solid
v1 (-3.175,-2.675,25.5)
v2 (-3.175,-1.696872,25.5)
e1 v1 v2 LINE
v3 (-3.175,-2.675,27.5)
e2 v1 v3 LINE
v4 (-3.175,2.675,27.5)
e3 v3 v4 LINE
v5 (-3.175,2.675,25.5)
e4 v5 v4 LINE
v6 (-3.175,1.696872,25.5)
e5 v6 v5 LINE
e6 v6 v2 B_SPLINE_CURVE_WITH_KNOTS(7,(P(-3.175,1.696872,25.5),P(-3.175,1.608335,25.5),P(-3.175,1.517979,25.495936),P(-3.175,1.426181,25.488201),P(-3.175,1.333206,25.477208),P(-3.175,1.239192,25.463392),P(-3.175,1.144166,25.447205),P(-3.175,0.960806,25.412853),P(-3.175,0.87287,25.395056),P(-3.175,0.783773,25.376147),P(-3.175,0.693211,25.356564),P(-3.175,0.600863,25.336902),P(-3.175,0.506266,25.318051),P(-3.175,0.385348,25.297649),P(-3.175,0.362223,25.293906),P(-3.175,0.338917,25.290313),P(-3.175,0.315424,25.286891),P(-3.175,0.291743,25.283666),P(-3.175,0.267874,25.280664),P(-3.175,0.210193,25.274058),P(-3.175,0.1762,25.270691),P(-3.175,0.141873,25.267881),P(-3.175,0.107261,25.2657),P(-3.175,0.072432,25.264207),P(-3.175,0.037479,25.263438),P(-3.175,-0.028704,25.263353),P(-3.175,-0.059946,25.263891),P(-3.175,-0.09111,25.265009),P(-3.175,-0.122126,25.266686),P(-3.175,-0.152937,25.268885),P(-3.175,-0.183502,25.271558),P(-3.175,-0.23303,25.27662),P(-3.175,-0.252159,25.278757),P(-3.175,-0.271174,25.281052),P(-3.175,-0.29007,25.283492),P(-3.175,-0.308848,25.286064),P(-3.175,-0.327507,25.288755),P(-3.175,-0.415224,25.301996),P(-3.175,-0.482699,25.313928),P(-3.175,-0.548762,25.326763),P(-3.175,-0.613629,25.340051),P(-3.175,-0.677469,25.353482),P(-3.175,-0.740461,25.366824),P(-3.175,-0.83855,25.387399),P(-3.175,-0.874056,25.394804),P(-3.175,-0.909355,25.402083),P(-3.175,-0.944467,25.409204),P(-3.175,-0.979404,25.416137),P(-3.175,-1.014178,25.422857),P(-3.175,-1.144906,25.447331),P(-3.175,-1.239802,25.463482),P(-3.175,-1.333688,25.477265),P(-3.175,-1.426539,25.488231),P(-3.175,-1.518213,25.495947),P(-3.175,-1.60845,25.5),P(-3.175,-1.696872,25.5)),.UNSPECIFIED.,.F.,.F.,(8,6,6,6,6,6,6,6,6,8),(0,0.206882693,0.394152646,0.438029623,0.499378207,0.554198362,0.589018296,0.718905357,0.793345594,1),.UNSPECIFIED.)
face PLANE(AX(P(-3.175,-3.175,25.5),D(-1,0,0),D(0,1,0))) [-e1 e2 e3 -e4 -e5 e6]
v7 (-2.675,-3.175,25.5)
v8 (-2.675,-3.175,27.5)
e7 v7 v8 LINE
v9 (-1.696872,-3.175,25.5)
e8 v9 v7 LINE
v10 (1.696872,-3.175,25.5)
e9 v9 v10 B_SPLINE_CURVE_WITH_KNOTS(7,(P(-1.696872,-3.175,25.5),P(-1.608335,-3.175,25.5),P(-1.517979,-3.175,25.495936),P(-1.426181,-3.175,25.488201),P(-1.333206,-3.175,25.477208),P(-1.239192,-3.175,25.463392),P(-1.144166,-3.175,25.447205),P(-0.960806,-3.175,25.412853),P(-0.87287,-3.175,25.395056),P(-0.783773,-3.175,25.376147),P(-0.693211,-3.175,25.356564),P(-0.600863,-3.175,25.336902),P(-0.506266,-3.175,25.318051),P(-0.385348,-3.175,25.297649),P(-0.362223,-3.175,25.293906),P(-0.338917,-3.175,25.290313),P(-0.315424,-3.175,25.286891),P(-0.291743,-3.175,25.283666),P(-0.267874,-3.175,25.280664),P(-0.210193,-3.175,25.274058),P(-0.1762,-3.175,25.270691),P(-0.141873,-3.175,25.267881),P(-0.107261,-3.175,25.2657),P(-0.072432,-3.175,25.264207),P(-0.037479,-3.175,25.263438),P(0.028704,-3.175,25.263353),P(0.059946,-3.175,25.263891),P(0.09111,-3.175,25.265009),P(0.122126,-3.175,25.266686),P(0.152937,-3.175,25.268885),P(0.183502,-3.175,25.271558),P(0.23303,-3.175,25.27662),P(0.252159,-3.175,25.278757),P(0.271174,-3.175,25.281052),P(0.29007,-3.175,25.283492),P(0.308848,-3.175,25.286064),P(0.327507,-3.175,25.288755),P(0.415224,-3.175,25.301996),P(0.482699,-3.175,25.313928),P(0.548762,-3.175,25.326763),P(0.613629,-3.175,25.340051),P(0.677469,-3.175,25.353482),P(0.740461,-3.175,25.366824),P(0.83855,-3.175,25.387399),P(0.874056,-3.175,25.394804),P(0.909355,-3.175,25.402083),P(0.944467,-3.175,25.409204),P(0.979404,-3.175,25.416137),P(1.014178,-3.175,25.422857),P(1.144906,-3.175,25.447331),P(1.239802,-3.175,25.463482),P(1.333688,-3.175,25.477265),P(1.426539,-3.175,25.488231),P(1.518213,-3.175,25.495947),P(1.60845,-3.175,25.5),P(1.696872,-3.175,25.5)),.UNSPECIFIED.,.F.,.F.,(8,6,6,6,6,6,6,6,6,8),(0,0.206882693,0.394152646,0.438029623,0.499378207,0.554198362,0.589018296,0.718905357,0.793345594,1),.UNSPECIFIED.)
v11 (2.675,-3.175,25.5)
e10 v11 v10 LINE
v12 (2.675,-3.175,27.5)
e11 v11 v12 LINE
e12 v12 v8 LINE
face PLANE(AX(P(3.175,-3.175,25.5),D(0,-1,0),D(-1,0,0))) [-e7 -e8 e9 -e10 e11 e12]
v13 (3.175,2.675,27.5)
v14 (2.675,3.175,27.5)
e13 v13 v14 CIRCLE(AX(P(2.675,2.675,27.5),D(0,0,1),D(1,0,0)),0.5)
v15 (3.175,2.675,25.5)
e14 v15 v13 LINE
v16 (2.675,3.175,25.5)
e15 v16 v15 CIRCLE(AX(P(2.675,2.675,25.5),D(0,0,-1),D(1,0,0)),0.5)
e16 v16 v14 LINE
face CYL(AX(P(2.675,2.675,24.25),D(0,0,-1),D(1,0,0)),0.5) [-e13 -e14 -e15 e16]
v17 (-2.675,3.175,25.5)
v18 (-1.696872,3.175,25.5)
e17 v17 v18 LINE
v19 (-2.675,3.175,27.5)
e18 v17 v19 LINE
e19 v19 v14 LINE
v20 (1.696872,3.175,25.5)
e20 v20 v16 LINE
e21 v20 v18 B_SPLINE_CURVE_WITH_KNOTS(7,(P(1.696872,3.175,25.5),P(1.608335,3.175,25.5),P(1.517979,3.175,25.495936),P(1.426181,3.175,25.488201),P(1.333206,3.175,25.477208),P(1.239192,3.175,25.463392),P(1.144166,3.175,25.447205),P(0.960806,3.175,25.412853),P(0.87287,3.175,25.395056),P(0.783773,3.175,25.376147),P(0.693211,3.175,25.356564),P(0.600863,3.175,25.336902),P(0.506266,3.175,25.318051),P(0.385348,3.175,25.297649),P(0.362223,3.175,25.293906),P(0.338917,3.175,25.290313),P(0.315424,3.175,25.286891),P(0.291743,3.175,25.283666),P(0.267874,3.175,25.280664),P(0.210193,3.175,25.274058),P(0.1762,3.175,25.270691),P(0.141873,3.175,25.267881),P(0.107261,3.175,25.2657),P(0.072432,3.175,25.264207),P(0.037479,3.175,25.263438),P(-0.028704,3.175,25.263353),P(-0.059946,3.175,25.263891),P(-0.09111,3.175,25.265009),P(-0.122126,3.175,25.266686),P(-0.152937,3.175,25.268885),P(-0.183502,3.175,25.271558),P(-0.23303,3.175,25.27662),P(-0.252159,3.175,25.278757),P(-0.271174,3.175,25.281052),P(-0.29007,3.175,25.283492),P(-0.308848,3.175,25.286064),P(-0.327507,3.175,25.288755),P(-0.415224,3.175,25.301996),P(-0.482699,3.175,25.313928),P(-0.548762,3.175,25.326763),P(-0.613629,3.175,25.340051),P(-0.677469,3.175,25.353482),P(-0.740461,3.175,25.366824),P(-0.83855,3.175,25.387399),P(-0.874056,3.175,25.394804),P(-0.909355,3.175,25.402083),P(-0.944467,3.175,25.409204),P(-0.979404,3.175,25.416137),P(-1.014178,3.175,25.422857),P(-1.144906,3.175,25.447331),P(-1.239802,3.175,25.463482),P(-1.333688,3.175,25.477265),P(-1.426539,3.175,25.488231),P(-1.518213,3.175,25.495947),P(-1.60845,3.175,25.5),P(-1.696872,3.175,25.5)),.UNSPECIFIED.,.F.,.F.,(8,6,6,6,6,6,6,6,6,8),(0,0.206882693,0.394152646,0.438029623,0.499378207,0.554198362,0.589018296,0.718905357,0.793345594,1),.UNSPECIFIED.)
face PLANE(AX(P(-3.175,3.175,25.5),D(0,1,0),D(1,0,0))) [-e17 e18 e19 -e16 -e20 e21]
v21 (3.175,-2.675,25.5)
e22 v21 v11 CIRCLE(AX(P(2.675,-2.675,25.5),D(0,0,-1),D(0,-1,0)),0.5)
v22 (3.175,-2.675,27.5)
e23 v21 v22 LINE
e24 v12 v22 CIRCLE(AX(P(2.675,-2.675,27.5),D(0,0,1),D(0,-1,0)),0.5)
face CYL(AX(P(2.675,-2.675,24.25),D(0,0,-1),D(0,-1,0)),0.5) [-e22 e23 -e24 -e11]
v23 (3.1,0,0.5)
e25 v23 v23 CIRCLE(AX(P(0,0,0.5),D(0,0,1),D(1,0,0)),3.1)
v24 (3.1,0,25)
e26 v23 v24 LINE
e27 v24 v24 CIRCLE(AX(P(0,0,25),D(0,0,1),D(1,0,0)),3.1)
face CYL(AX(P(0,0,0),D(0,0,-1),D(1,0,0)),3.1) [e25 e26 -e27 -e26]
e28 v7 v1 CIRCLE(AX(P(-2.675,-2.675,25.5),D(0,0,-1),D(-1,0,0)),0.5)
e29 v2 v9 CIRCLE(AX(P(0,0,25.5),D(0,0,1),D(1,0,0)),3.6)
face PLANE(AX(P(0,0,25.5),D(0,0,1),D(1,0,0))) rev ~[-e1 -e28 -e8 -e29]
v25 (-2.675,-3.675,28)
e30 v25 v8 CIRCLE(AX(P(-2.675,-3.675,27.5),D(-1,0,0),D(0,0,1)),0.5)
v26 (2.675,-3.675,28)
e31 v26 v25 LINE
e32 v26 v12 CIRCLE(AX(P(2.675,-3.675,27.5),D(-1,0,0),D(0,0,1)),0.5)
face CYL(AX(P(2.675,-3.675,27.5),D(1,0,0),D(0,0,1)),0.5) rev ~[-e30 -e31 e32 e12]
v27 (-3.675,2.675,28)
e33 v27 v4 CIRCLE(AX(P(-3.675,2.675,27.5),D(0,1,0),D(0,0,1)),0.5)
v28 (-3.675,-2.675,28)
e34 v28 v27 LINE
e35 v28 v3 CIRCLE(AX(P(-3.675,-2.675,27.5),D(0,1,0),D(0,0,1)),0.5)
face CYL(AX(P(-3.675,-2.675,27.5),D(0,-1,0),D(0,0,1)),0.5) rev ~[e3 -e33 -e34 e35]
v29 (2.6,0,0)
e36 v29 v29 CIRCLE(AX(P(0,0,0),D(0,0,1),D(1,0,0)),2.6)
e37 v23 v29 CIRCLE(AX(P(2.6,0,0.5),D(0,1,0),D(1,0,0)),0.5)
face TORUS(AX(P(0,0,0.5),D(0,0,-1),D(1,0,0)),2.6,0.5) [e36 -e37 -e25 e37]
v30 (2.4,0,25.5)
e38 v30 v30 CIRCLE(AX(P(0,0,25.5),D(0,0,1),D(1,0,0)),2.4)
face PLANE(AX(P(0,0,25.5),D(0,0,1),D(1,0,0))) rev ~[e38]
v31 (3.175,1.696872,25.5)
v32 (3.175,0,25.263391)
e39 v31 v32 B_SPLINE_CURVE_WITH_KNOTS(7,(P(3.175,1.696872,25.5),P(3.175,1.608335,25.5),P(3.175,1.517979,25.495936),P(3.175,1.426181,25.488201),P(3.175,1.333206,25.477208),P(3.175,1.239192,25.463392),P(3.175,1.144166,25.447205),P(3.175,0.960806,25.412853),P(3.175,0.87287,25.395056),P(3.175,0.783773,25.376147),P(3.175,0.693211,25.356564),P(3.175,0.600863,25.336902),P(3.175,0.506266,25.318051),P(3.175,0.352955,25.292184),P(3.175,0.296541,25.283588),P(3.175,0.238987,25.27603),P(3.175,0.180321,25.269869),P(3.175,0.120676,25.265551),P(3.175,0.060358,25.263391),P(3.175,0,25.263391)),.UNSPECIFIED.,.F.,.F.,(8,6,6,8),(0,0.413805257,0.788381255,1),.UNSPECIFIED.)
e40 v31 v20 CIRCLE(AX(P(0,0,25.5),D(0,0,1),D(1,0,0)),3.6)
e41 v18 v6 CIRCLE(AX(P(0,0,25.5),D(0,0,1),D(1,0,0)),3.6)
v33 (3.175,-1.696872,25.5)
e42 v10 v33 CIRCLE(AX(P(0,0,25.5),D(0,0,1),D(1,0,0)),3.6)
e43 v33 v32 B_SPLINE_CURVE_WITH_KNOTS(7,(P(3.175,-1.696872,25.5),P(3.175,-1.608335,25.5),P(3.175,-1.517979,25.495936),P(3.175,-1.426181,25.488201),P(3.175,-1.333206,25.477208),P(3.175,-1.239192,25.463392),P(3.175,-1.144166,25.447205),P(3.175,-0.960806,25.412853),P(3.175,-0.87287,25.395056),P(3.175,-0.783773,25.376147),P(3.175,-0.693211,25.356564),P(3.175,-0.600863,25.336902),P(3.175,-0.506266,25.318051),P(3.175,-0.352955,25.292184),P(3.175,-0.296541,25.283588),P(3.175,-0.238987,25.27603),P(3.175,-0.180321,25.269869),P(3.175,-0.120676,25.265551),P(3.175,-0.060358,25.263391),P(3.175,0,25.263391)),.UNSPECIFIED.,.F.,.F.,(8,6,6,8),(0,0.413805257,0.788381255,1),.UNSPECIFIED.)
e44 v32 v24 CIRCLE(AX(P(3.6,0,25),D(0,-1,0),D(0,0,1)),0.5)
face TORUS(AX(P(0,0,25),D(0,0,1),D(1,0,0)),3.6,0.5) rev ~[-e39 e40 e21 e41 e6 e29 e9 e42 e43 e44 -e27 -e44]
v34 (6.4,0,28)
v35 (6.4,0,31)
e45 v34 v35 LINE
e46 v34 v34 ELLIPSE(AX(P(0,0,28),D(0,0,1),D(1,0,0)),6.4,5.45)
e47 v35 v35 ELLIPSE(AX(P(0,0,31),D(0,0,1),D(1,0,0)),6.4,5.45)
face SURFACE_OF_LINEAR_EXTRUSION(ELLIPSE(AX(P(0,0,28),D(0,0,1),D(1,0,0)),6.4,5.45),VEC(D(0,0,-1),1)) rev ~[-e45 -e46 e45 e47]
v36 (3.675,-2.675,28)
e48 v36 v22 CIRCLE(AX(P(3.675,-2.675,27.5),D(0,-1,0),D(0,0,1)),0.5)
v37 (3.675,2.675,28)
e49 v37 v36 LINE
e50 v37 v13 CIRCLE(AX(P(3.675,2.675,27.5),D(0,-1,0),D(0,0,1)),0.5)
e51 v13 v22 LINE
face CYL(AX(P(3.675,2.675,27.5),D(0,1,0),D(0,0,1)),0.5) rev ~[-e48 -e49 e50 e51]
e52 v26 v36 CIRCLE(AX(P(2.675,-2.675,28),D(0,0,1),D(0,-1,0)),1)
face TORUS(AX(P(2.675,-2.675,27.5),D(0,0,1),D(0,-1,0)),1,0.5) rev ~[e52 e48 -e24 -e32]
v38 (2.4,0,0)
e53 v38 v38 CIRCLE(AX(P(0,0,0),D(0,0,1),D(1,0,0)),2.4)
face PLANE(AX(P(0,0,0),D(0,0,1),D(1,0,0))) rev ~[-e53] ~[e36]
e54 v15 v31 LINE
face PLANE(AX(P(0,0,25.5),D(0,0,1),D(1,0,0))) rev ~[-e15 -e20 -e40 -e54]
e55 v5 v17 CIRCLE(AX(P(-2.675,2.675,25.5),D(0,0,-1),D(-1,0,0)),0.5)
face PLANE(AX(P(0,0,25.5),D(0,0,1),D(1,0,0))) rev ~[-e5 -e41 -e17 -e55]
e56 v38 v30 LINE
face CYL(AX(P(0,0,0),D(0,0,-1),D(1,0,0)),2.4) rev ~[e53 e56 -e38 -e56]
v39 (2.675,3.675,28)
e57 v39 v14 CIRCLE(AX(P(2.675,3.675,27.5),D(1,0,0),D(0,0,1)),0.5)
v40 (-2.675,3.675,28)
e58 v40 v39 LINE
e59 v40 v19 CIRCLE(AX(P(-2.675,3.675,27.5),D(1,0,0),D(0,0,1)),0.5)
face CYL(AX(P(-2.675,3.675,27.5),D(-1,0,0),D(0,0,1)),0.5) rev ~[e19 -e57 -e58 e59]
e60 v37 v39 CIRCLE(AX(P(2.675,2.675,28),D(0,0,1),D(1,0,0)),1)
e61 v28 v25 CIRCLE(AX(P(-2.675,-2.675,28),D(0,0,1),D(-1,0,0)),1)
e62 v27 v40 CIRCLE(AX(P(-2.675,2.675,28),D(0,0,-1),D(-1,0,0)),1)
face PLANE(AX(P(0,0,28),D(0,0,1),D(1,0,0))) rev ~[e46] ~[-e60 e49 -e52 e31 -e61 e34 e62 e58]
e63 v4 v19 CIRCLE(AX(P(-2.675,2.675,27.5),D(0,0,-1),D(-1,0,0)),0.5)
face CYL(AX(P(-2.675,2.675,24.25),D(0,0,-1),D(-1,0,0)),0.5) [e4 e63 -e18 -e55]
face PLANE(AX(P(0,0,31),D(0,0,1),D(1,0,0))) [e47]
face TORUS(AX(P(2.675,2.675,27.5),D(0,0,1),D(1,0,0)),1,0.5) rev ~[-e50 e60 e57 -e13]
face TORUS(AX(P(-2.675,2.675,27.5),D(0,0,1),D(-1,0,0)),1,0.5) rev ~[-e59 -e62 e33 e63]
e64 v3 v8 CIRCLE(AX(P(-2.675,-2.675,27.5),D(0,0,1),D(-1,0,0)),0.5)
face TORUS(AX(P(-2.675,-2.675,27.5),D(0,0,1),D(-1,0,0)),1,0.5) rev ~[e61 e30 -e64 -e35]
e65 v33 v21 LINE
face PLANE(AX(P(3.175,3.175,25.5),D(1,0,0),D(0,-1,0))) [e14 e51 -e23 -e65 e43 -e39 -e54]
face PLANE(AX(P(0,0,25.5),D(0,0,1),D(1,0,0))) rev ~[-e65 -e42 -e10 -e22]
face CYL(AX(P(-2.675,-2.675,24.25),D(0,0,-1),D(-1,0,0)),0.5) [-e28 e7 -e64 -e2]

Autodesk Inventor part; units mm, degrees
ref_plane "YZ Plane" through (0, 0, 0) normal (1, 0, 0) x (0, 1, 0)
ref_plane "XZ Plane" through (0, 0, 0) normal (0, 1, 0) x (-1, 0, 0)
ref_plane "XY Plane" through (0, 0, 0) normal (0, 0, 1) x (1, 0, 0)
sketch "Sketch1" plane through (0, 0, 0) normal (0, 0, 1) x (1, 0, 0)
  circle A0 centre (0, 0) radius 3.1
  circle A1 centre (0, 0) radius 2.4
  dimension "d0" = 6.2
  dimension "d1" = 4.8
extrude "Extrusion1" add sketch "Sketch1" along normal blind 25.5
sketch "Sketch2" plane through (0, 0, 25.5) normal (0, 0, 1) x (1, 0, 0)
  line L0 (-3.175, 3.175) -> (3.175, 3.175)
  line L1 (3.175, 3.175) -> (3.175, -3.175)
  line L2 (3.175, -3.175) -> (-3.175, -3.175)
  line L3 (-3.175, -3.175) -> (-3.175, 3.175)
  circle A0 centre (0, 0) radius 2.4 projected
  line L4 (-3.175, 3.175) -> (3.175, -3.175) construction
  line L5 (3.175, 3.175) -> (-3.175, -3.175) construction
  dimension "d4" = 6.35
  dimension "d5" = 6.35
extrude "Extrusion2" add sketch "Sketch2" along normal blind 2.5 contours L0 L1 L2 L3 | A0
sketch "Sketch3" plane through (0, 0, 28) normal (0, 0, 1) x (1, 0, 0)
  ellipse E0 centre (0, 0) end of major axis (6.4, 0) minor radius 5.45
  dimension "d8" = 5.45
  dimension "d9" = 6.4
extrude "Extrusion3" add sketch "Sketch3" along normal blind 3
fillet "Fillet1" [suppressed]
fillet "Fillet2" radius 0.5 10 edges at (-3.175, 3.175, 26.75) (3.175, 3.175, 26.75) (0, 3.175, 28) (-3.175, 0, 28) (-3.175, -3.175, 26.75) (0, -3.175, 28) (3.175, -3.175, 26.75) (3.175, 0, 28) (-3.1, 0, 25.5) (-3.1, 0, 0)
thread "Thread1" size "M5x0.8" class "6H" standard "ANSI Metric M Profile" full length
properties part number "skaterScrew" material "Stainless Steel"
